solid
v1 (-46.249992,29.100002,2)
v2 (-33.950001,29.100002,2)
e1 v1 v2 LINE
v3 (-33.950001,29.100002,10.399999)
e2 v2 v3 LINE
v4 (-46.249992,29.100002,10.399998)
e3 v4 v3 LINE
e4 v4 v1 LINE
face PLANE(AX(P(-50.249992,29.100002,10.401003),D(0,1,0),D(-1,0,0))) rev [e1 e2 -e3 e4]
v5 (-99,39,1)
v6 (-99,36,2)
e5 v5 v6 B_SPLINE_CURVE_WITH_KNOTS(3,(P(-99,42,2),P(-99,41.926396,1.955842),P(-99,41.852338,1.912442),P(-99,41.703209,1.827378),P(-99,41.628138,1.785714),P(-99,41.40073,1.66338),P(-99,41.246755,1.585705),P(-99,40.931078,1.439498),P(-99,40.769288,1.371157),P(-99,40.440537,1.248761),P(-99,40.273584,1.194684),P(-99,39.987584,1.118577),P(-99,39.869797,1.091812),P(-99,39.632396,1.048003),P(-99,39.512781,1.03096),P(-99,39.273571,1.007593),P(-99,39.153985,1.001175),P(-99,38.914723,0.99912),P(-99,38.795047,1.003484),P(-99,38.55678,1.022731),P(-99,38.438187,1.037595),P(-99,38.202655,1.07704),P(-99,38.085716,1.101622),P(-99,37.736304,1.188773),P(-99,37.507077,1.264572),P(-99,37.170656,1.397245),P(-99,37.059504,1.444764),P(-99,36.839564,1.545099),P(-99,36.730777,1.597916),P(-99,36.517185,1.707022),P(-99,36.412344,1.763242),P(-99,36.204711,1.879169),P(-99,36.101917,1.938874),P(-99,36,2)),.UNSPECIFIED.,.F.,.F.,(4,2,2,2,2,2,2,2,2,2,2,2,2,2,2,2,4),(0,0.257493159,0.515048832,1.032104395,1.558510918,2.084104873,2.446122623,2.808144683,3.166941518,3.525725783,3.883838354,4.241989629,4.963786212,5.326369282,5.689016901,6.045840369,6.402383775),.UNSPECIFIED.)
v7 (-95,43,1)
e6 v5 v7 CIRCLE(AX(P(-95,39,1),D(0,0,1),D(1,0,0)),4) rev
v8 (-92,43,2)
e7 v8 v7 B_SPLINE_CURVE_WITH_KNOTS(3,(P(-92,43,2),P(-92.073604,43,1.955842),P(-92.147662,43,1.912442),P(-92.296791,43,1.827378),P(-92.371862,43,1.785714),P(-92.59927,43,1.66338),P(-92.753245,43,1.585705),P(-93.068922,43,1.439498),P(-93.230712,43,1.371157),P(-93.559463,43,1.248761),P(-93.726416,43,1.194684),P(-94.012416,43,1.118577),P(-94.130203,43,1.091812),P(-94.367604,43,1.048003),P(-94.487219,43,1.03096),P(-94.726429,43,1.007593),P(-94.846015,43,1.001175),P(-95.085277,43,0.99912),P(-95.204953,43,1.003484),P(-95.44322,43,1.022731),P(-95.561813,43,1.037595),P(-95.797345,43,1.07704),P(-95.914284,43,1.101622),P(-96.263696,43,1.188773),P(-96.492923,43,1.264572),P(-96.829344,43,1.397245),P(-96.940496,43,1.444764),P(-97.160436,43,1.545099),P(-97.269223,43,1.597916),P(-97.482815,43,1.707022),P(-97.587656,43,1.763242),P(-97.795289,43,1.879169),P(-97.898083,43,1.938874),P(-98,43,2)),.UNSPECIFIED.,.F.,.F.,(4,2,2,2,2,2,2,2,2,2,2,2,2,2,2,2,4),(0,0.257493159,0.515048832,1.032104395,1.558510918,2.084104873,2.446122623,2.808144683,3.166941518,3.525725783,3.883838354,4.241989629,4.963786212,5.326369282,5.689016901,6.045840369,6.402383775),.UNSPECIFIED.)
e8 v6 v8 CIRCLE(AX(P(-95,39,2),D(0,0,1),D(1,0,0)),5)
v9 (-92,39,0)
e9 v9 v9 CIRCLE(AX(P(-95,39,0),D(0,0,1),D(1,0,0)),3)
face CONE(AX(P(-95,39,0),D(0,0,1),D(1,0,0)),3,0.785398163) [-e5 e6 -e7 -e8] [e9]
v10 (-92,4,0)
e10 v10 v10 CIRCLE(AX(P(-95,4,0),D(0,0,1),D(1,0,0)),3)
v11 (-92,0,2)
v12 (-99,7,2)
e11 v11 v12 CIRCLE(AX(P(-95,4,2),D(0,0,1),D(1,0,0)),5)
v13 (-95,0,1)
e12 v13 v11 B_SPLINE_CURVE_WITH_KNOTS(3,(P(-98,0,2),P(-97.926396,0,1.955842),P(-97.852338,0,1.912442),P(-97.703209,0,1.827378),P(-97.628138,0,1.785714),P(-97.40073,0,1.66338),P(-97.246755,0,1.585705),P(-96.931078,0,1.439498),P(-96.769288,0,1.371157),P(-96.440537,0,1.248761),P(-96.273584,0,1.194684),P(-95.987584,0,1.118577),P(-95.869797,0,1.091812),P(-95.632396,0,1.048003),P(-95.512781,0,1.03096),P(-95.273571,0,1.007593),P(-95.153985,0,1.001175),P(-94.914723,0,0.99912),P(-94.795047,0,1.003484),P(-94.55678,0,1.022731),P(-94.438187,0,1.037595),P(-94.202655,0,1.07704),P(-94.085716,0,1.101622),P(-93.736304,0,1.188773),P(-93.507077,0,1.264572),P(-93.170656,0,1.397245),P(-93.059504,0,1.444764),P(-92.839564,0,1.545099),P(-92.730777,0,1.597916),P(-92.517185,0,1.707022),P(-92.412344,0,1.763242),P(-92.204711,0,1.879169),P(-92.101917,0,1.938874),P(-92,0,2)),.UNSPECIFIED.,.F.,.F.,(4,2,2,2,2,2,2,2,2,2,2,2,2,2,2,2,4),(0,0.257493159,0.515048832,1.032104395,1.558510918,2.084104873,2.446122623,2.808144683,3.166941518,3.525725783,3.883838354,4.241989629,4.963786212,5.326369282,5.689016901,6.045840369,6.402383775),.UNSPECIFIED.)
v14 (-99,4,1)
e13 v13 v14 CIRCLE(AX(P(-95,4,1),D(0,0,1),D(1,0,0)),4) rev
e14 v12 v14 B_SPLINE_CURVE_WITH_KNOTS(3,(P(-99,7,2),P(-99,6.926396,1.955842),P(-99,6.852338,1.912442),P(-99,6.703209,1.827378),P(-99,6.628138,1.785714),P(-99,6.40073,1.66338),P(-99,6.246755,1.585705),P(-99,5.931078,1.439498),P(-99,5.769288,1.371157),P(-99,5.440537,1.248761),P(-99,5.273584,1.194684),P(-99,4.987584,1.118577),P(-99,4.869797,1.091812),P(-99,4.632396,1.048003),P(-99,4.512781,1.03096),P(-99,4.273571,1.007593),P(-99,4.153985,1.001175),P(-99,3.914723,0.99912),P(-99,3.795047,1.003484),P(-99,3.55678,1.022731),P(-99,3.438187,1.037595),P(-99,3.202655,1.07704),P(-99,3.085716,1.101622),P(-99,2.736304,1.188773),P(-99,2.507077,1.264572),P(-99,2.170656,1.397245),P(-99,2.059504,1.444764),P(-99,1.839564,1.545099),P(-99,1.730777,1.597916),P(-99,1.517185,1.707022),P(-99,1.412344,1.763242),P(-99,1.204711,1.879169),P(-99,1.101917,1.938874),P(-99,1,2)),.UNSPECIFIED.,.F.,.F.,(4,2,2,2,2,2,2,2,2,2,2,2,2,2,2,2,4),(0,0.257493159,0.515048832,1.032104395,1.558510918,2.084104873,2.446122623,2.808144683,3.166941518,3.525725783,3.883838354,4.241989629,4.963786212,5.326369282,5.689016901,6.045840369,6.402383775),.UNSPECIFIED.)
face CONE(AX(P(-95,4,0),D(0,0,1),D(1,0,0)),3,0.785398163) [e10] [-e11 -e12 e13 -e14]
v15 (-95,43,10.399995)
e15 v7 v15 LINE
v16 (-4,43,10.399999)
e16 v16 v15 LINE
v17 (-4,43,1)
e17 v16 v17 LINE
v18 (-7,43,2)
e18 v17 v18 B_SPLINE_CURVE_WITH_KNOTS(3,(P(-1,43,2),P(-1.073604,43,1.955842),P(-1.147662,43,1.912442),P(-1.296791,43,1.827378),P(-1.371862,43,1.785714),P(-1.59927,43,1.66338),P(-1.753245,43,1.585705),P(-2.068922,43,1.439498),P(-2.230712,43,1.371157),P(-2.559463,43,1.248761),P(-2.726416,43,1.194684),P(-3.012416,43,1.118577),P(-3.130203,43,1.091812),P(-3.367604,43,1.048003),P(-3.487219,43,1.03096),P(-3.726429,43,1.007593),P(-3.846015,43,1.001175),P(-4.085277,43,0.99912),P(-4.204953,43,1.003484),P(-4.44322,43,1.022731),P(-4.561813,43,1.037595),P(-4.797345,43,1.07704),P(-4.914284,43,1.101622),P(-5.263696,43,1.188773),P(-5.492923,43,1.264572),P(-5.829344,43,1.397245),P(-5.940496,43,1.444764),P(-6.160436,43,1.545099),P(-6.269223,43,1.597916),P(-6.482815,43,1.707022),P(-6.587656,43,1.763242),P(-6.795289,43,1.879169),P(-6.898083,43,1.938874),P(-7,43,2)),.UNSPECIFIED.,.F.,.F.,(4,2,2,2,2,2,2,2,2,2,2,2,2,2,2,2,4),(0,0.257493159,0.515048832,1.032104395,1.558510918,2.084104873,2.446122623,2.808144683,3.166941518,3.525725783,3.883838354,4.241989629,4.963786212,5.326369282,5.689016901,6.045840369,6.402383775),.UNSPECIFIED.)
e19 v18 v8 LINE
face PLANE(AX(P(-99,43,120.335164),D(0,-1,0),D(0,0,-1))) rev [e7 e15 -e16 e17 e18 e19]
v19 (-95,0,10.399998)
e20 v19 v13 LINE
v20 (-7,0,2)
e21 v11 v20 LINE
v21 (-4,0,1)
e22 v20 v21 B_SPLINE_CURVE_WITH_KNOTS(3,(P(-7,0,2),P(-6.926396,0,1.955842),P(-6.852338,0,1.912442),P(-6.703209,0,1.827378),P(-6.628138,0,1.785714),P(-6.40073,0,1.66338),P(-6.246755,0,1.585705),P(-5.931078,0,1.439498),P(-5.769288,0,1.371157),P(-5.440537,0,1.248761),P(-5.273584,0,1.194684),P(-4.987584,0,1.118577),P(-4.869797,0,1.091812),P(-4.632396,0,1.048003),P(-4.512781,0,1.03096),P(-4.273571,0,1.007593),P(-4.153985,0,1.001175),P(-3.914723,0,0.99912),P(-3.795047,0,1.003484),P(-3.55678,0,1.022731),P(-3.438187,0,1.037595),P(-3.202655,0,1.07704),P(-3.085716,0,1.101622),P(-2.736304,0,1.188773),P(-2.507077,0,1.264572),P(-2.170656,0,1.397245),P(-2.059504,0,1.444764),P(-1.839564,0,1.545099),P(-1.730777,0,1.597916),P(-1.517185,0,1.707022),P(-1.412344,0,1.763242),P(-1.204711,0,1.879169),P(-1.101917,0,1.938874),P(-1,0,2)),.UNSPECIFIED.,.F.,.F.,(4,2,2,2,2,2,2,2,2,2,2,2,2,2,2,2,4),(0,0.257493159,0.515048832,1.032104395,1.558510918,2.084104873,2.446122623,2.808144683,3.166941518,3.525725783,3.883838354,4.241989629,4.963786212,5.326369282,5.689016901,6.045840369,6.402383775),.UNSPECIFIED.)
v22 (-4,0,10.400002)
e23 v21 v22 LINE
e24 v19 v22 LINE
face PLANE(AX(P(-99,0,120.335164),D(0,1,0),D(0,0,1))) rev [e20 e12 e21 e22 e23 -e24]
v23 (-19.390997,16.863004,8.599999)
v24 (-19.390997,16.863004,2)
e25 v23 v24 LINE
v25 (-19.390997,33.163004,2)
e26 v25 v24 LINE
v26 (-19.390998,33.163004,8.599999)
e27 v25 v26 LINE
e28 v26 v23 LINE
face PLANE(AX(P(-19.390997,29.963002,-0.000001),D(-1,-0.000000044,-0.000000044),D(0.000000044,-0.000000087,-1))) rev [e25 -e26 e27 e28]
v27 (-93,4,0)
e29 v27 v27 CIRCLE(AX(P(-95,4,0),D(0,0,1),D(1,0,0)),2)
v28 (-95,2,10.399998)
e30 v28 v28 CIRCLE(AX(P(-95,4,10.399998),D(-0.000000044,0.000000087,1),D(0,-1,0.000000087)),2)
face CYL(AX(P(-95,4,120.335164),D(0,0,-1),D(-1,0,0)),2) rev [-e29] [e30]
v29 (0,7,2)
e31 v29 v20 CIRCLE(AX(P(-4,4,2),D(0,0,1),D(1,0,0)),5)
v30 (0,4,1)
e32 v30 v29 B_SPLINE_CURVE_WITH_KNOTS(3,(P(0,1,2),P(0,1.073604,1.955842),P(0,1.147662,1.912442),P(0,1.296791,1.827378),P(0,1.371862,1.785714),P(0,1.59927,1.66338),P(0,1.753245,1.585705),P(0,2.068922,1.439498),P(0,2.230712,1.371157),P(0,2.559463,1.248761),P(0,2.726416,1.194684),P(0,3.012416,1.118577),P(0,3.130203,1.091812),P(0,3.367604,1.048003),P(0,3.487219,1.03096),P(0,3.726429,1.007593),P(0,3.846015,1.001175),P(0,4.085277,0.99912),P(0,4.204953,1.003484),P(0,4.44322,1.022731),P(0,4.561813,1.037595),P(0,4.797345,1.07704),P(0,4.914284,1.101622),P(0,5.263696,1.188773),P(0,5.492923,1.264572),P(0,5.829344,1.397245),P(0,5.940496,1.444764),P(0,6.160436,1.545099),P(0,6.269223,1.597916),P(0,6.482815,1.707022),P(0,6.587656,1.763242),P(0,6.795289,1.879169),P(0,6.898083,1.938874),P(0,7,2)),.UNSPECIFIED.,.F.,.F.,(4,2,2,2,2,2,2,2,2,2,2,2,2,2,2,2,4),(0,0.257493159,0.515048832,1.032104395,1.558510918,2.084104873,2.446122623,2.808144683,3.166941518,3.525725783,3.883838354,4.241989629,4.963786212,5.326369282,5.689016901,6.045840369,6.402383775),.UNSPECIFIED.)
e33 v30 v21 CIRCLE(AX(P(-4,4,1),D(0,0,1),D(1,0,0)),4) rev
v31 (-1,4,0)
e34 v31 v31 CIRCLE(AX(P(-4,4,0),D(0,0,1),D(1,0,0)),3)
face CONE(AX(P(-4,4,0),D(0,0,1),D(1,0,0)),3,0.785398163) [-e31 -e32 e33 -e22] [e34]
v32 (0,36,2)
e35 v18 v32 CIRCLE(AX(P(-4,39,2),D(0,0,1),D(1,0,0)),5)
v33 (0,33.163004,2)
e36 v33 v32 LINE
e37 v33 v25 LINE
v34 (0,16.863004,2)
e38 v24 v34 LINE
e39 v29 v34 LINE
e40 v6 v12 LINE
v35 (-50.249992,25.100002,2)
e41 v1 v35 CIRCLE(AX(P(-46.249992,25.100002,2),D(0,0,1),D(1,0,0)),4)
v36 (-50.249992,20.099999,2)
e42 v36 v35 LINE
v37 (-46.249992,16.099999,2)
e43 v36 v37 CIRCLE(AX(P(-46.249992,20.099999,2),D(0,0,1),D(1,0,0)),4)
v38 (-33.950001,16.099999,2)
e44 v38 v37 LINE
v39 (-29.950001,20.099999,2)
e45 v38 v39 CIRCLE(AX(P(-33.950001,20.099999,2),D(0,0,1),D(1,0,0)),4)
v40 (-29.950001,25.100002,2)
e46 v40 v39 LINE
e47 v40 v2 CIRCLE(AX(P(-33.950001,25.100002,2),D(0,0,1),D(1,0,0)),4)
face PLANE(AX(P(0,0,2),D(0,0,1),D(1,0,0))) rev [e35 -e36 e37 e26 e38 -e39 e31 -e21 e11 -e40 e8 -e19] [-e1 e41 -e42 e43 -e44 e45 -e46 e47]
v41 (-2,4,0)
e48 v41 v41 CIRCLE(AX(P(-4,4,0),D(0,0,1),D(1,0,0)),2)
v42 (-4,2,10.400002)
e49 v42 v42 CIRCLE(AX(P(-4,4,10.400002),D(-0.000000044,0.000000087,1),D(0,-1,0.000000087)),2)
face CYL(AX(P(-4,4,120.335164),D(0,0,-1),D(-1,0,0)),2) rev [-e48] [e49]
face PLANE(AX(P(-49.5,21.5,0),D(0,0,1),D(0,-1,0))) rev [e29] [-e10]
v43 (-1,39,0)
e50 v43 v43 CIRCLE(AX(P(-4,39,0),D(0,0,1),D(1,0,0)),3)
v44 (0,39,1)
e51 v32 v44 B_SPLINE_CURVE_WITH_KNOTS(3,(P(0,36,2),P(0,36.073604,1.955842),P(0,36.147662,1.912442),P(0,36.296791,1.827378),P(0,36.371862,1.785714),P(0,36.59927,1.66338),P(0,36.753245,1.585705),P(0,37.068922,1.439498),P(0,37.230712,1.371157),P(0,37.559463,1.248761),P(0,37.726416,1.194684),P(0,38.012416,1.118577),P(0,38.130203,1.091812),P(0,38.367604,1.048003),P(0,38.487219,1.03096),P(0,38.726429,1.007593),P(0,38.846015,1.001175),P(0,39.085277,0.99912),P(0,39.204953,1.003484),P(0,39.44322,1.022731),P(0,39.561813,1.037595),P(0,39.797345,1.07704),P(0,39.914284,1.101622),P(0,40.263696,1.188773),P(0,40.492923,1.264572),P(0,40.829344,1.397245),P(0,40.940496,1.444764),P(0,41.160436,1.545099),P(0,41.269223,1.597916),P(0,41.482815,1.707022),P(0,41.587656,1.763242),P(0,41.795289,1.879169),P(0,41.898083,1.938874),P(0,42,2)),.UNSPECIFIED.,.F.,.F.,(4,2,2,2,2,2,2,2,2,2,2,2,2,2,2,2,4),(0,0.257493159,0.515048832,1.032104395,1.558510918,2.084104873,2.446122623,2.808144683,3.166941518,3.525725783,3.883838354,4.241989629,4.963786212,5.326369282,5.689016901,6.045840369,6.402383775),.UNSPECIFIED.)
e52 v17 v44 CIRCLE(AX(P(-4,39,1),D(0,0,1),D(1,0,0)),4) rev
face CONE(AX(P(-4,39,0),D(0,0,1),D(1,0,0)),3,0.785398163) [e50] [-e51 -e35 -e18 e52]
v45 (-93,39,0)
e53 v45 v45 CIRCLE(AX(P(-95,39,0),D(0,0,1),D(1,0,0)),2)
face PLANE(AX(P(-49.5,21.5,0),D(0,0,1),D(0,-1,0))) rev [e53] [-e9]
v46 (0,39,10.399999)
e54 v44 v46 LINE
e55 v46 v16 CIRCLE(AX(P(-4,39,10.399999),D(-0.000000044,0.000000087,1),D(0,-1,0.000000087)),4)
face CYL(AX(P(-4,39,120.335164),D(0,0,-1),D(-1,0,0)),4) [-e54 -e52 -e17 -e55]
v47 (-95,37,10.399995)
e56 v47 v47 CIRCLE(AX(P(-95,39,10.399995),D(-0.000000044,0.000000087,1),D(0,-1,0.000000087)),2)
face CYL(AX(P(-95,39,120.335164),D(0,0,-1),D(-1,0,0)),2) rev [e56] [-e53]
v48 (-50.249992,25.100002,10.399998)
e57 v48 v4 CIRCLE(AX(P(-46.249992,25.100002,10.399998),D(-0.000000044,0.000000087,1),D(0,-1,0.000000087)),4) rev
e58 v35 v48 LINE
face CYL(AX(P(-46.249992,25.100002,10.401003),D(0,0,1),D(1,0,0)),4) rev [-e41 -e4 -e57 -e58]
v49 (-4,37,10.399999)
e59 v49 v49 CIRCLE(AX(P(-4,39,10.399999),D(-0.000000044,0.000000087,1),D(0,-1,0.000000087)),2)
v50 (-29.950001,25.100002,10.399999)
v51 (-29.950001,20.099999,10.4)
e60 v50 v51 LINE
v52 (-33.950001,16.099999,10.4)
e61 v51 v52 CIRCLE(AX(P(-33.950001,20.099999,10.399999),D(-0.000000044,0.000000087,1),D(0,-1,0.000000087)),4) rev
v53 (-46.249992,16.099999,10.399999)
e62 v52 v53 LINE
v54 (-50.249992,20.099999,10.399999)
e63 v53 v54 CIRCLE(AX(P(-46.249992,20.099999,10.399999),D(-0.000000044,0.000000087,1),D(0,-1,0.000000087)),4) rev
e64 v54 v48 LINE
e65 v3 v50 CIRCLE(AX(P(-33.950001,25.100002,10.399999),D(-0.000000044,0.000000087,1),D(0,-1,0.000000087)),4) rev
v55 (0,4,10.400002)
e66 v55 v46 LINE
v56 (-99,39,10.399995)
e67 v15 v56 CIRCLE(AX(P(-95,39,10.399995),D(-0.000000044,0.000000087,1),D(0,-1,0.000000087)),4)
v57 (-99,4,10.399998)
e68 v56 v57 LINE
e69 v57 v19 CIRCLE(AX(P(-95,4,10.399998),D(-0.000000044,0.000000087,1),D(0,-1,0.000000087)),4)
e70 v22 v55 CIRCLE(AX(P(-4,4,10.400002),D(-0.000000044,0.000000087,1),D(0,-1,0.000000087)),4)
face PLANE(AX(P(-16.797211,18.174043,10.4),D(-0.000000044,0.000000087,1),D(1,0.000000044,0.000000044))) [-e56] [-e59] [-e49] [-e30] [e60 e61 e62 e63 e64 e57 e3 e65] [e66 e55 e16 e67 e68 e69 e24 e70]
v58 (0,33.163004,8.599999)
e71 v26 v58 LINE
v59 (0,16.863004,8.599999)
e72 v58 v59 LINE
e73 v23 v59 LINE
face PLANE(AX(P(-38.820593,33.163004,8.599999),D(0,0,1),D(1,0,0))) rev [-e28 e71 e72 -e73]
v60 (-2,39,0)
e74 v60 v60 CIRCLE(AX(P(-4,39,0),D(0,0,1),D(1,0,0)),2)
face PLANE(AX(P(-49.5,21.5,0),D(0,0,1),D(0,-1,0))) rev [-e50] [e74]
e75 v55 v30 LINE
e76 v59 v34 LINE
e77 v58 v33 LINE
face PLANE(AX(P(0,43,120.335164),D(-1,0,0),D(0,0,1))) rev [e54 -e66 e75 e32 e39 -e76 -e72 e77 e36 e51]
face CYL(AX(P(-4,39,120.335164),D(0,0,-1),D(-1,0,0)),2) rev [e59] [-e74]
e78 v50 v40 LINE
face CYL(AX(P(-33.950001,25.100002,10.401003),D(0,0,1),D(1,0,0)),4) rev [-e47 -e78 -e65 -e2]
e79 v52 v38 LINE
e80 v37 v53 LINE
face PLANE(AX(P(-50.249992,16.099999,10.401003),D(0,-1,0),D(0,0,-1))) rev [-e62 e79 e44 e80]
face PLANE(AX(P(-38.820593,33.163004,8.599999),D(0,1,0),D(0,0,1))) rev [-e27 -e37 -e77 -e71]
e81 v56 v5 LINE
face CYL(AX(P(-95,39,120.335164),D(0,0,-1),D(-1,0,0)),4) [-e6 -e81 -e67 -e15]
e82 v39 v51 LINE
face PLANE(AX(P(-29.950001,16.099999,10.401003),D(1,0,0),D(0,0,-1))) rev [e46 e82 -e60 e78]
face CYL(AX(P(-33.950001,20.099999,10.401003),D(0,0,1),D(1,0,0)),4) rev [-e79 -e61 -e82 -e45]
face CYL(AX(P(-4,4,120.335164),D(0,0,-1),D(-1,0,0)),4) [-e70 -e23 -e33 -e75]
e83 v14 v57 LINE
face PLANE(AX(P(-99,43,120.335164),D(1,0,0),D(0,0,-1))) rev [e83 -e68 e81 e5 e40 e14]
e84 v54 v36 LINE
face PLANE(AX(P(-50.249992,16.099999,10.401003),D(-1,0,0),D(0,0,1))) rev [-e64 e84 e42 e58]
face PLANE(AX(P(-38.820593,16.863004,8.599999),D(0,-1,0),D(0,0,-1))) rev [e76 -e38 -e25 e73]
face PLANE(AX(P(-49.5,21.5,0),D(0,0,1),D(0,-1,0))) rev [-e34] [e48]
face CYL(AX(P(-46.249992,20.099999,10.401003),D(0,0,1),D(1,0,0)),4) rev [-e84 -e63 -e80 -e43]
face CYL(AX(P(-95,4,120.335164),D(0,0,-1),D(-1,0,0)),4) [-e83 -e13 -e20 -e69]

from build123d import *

# Parameters (mm, degrees)
SKETCH3_W           = 99
SKETCH3_H           = 43
SKETCH3_R           = 2
BOSS_EXTRUDE2_DEPTH = 8.399995141
BOSS_EXTRUDE3_START = 2
SKETCH4_R           = 3
SKETCH4_R_2         = 2
BOSS_EXTRUDE3_DEPTH = 2
CHAMFER1_SIZE       = 2
SKETCH5_W           = 8.599999433
SKETCH5_H           = 16.3
CUT_EXTRUDE1_DEPTH  = 19.390997243
CUT_EXTRUDE2_REACH  = 110.262
SKETCH6_W           = 20.299990895
SKETCH6_H           = 13.000003078
FILLET1_R           = 4


# Some blends are built 0.0001 mm under size
with BuildPart() as part:
    # Sketch3 → Boss-Extrude2 (new body)
    with BuildSketch(Plane.XY.offset(2)):
        with Locations((-49.5, 21.5)):
            Rectangle(SKETCH3_W, SKETCH3_H)
        with Locations(Location((-95, 39, 0), (0, 0, 270))):
            Circle(SKETCH3_R, mode=Mode.SUBTRACT)
        with Locations(Location((-95, 4, 0), (0, 0, 270))):
            Circle(SKETCH3_R, mode=Mode.SUBTRACT)
        with Locations(Location((-4, 4, 0), (0, 0, 270))):
            Circle(SKETCH3_R, mode=Mode.SUBTRACT)
        with Locations(Location((-4, 39, 0), (0, 0, 270))):
            Circle(SKETCH3_R, mode=Mode.SUBTRACT)
    extrude(amount=BOSS_EXTRUDE2_DEPTH)

    # Sketch4 → Boss-Extrude3 (add)
    # profile 1 of 4: a face of its own
    with BuildSketch(Plane(origin=(0, 0, 2), x_dir=(-1, 0, 0), z_dir=(0, 0, -1)).offset(BOSS_EXTRUDE3_START)):
        with Locations(Location((4, 39, 0), (0, 0, 180))):
            Circle(SKETCH4_R)
        with Locations(Location((4, 39, 0), (0, 0, 270))):
            Circle(SKETCH4_R_2, mode=Mode.SUBTRACT)
    # profile 2 of 4: a face of its own
    with BuildSketch(Plane(origin=(0, 0, 2), x_dir=(-1, 0, 0), z_dir=(0, 0, -1)).offset(BOSS_EXTRUDE3_START)):
        with Locations(Location((95, 39, 0), (0, 0, 180))):
            Circle(SKETCH4_R)
        with Locations(Location((95, 39, 0), (0, 0, 270))):
            Circle(SKETCH4_R_2, mode=Mode.SUBTRACT)
    # profile 3 of 4: a face of its own
    with BuildSketch(Plane(origin=(0, 0, 2), x_dir=(-1, 0, 0), z_dir=(0, 0, -1)).offset(BOSS_EXTRUDE3_START)):
        with Locations(Location((95, 4, 0), (0, 0, 180))):
            Circle(SKETCH4_R)
        with Locations(Location((95, 4, 0), (0, 0, 270))):
            Circle(SKETCH4_R_2, mode=Mode.SUBTRACT)
    # profile 4 of 4: a face of its own
    with BuildSketch(Plane(origin=(0, 0, 2), x_dir=(-1, 0, 0), z_dir=(0, 0, -1)).offset(BOSS_EXTRUDE3_START)):
        with Locations(Location((4, 4, 0), (0, 0, 180))):
            Circle(SKETCH4_R)
        with Locations(Location((4, 4, 0), (0, 0, 270))):
            Circle(SKETCH4_R_2, mode=Mode.SUBTRACT)
    extrude(amount=-BOSS_EXTRUDE3_DEPTH)

    # Chamfer1
    # the kernel refuses this chamfer: 2 mm, written as the material it adds along each edge
    with BuildSketch(Plane(origin=(-4, 39, 2), x_dir=(1, 0, 0), z_dir=(0, 1, 0))) as chamfer1_piece_1_section:
        Polygon((3 + CHAMFER1_SIZE, 0), (3, CHAMFER1_SIZE), (3, 0), align=None)
    chamfer1_piece_1 = revolve(axis=Axis((-4, 39, 2), (0, 0, -1)), mode=Mode.PRIVATE)
    chamfer1_piece_1 = split(chamfer1_piece_1, bisect_by=Plane(origin=(-8.002812408, 43, 1.053756135), z_dir=(0, -1, 0)), keep=Keep.TOP, mode=Mode.PRIVATE)
    chamfer1_piece_1 = split(chamfer1_piece_1, bisect_by=Plane(origin=(0, 39, 1.053756135), z_dir=(-1, 0, 0)), keep=Keep.TOP, mode=Mode.PRIVATE)
    chamfer1_piece_1 = split(chamfer1_piece_1, bisect_by=Plane(origin=(-8.002812408, 39, 0), z_dir=(0, 0, 1)), keep=Keep.TOP, mode=Mode.PRIVATE)
    add(chamfer1_piece_1)
    with BuildSketch(Plane(origin=(-95, 39, 2), x_dir=(1, 0, 0), z_dir=(0, 1, 0))) as chamfer1_piece_2_section:
        Polygon((3 + CHAMFER1_SIZE, 0), (3, CHAMFER1_SIZE), (3, 0), align=None)
    chamfer1_piece_2 = revolve(axis=Axis((-95, 39, 2), (0, 0, -1)), mode=Mode.PRIVATE)
    chamfer1_piece_2 = split(chamfer1_piece_2, bisect_by=Plane(origin=(-92.655832372, 43, 1.739278981), z_dir=(0, -1, 0)), keep=Keep.TOP, mode=Mode.PRIVATE)
    chamfer1_piece_2 = split(chamfer1_piece_2, bisect_by=Plane(origin=(-99, 34.939782567, 1.739278981), z_dir=(1, 0, 0)), keep=Keep.TOP, mode=Mode.PRIVATE)
    chamfer1_piece_2 = split(chamfer1_piece_2, bisect_by=Plane(origin=(-92.655832372, 34.939782567, 0), z_dir=(0, 0, 1)), keep=Keep.TOP, mode=Mode.PRIVATE)
    add(chamfer1_piece_2)
    with BuildSketch(Plane(origin=(-95, 4, 2), x_dir=(1, 0, 0), z_dir=(0, 1, 0))) as chamfer1_piece_3_section:
        Polygon((3 + CHAMFER1_SIZE, 0), (3, CHAMFER1_SIZE), (3, 0), align=None)
    chamfer1_piece_3 = revolve(axis=Axis((-95, 4, 2), (0, 0, -1)), mode=Mode.PRIVATE)
    chamfer1_piece_3 = split(chamfer1_piece_3, bisect_by=Plane(origin=(-99, 0.533462766, 1.053756132), z_dir=(1, 0, 0)), keep=Keep.TOP, mode=Mode.PRIVATE)
    chamfer1_piece_3 = split(chamfer1_piece_3, bisect_by=Plane(origin=(-92.998593795, 0, 1.053756132), z_dir=(0, 1, 0)), keep=Keep.TOP, mode=Mode.PRIVATE)
    chamfer1_piece_3 = split(chamfer1_piece_3, bisect_by=Plane(origin=(-92.998593795, 0.533462766, 0), z_dir=(0, 0, 1)), keep=Keep.TOP, mode=Mode.PRIVATE)
    add(chamfer1_piece_3)
    with BuildSketch(Plane(origin=(-4, 4, 2), x_dir=(1, 0, 0), z_dir=(0, 1, 0))) as chamfer1_piece_4_section:
        Polygon((3 + CHAMFER1_SIZE, 0), (3, CHAMFER1_SIZE), (3, 0), align=None)
    chamfer1_piece_4 = revolve(axis=Axis((-4, 4, 2), (0, 0, -1)), mode=Mode.PRIVATE)
    chamfer1_piece_4 = split(chamfer1_piece_4, bisect_by=Plane(origin=(0, 4, 1.053756135), z_dir=(-1, 0, 0)), keep=Keep.TOP, mode=Mode.PRIVATE)
    chamfer1_piece_4 = split(chamfer1_piece_4, bisect_by=Plane(origin=(-8.002812408, 0, 1.053756135), z_dir=(0, 1, 0)), keep=Keep.TOP, mode=Mode.PRIVATE)
    chamfer1_piece_4 = split(chamfer1_piece_4, bisect_by=Plane(origin=(-8.002812408, 4, 0), z_dir=(0, 0, 1)), keep=Keep.TOP, mode=Mode.PRIVATE)
    add(chamfer1_piece_4)

    # Sketch5 → Cut-Extrude1 (cut)
    with BuildSketch(Plane(origin=(0, 0, 0), x_dir=(0, 0, -1), z_dir=(1, 0, 0))):
        with Locations((-4.299999717, 25.013003939)):
            Rectangle(SKETCH5_W, SKETCH5_H)
    extrude(amount=-CUT_EXTRUDE1_DEPTH, mode=Mode.SUBTRACT)

    # Sketch6 → Cut-Extrude2 (cut, up to next)
    with BuildSketch(Plane(origin=(0, 0, 2), x_dir=(-1, 0, 0), z_dir=(0, 0, -1)), mode=Mode.PRIVATE) as cut_extrude2_sk1:
        with Locations((40.099996563, 22.600000838)):
            Rectangle(SKETCH6_W, SKETCH6_H)
    cut_extrude2_tool1 = extrude(cut_extrude2_sk1.sketch, amount=-CUT_EXTRUDE2_REACH, mode=Mode.PRIVATE) & part.part
    add(cut_extrude2_tool1.solids().sort_by_distance((-40.099997, 22.600001, 2))[0], mode=Mode.SUBTRACT)

    # Fillet1
    fillet1_edges = [part.edges().sort_by_distance(p)[0] for p in [
        (-50.249992011, 16.099999299, 6.19999757),
        (-50.249992011, 29.100002377, 6.19999757),
        (-29.950001116, 29.100002377, 6.19999757),
        (-29.950001116, 16.099999299, 6.19999757),
        (-99, 0, 6.19999757),
        (0, 0, 6.19999757),
        (0, 43, 6.19999757),
        (-99, 43, 6.19999757),
    ]]
    fillet(fillet1_edges, radius=FILLET1_R - 0.0001)  # a hair under: the kernel refuses the full size


solid = part.part
